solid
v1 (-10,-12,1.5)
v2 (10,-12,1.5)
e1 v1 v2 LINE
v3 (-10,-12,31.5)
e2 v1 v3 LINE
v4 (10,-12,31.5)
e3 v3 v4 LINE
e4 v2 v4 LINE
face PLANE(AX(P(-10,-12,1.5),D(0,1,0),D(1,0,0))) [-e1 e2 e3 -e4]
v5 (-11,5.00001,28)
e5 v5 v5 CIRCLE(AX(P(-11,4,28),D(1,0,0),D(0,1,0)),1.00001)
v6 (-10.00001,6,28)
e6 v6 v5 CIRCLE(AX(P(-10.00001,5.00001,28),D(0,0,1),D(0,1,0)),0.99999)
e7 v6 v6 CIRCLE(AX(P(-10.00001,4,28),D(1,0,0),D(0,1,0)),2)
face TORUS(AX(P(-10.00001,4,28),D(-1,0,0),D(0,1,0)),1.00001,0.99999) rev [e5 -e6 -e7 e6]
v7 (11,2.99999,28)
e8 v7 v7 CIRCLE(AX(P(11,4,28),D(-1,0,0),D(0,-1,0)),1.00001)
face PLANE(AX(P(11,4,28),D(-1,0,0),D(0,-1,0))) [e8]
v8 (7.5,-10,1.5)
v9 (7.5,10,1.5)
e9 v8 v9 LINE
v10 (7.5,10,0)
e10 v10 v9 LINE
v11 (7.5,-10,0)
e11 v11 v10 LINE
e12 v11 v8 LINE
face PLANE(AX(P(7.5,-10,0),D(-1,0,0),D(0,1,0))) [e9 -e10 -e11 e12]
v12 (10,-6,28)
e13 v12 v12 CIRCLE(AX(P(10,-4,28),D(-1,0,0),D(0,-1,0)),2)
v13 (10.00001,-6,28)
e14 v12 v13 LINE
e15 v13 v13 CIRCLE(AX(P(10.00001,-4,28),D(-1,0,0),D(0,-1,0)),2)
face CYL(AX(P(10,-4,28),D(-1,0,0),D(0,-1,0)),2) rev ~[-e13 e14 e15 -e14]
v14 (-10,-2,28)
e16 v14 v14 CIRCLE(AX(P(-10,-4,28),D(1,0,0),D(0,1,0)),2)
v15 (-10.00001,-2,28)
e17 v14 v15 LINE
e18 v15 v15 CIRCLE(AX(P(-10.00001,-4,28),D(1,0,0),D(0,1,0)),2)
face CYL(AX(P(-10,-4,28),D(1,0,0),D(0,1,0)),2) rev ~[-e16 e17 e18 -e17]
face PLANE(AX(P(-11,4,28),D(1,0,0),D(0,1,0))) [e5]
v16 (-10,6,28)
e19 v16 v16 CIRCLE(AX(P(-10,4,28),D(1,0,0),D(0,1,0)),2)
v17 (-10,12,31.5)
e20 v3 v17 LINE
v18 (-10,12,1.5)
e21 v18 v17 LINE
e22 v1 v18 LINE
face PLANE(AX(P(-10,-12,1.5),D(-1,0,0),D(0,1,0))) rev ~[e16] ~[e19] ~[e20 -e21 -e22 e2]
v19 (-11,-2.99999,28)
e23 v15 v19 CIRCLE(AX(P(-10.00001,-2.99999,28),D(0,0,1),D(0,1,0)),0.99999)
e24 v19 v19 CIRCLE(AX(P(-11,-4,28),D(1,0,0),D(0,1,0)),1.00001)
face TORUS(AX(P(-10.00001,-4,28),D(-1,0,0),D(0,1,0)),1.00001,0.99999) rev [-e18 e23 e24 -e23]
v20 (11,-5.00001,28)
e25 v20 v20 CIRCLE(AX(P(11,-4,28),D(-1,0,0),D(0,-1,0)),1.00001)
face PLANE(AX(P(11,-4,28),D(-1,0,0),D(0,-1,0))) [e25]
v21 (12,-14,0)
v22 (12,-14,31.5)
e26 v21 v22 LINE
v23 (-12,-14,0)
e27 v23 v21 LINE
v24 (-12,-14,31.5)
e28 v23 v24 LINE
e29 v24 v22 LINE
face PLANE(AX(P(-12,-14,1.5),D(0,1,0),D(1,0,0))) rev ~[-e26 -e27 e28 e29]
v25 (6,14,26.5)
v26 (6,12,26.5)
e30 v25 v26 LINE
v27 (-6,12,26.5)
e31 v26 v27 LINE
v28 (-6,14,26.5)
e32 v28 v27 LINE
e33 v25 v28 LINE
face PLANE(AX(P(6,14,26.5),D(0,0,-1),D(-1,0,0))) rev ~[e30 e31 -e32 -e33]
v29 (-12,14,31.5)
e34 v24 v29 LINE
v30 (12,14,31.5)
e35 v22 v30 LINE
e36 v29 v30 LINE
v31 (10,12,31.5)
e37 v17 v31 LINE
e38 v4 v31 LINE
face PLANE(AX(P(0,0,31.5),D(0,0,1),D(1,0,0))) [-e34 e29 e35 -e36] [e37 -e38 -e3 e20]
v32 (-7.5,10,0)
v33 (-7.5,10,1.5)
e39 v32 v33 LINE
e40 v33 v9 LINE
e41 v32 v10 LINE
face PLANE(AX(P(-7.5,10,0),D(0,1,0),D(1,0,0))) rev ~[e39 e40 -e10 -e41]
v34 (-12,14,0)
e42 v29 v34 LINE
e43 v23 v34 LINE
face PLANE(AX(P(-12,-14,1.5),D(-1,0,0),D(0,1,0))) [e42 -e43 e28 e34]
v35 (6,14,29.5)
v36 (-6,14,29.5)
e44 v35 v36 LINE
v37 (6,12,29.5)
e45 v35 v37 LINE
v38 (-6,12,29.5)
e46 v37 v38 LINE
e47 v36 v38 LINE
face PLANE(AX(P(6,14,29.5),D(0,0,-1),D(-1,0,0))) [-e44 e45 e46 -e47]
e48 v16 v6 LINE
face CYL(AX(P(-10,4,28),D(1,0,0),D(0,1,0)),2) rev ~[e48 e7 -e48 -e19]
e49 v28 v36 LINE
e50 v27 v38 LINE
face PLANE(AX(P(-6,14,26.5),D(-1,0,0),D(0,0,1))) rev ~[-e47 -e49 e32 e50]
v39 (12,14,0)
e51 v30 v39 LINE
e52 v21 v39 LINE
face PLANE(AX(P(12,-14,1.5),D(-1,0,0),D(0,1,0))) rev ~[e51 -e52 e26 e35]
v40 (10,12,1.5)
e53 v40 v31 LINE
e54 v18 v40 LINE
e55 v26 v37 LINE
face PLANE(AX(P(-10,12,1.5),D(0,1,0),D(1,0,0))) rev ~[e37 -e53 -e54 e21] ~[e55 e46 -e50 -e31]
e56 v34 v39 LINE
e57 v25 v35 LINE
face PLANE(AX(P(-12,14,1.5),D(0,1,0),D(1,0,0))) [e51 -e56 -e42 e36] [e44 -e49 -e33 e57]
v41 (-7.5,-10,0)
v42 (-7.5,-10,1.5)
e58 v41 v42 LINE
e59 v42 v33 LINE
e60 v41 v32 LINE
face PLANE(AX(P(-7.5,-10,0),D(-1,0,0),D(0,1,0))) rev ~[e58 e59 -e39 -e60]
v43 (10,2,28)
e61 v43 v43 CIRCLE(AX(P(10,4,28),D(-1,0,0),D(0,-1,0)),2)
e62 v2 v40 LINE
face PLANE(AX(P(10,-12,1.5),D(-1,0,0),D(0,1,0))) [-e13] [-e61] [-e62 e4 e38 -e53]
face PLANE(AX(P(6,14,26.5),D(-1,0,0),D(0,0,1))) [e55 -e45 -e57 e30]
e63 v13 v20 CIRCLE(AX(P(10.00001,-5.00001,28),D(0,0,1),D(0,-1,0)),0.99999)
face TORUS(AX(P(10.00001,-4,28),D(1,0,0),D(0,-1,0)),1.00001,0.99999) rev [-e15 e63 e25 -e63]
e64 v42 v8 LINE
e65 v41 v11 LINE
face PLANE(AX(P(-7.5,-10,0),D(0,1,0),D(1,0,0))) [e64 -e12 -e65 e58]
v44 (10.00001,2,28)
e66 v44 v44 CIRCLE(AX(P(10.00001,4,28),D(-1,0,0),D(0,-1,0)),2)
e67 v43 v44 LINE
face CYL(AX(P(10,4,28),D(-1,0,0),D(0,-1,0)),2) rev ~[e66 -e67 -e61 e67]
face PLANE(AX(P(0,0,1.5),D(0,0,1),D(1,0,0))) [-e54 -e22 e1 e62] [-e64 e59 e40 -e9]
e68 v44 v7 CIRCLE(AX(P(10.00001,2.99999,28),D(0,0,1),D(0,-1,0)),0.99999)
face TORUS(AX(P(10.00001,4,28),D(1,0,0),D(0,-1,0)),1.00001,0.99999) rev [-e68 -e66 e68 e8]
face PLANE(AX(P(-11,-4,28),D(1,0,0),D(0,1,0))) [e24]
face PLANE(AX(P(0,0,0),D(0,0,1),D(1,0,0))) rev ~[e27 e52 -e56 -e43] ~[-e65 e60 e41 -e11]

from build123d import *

# Parameters (mm, degrees)
F0_W      = 24
F0_H      = 28
F0_W_2    = 15
F0_H_2    = 20
F1_DEPTH  = 1.5
F2_W      = 24
F2_H      = 28
F2_W_2    = 20
F2_H_2    = 24
F3_DEPTH  = 30
F4_R      = 2
F5_DEPTH  = 1
F6_R      = 2
F7_DEPTH  = 1
F8_R      = 0.99999
F9_W      = 12
F9_H      = 3
F10_DEPTH = 2


# Not quite as in the source:
# - a fillet or chamfer is up to 0.001 mm smaller than in the source, because OpenCascade refuses the exact size


with BuildPart() as f1:
    # F0 (on Top) → F1 (new body)
    with BuildSketch(Plane.XY):
        Rectangle(F0_W, F0_H)
        Rectangle(F0_W_2, F0_H_2, mode=Mode.SUBTRACT)
    extrude(amount=F1_DEPTH)

    # F2 (on face) → F3 (join)
    with BuildSketch(Plane.XY.offset(1.5)):
        Rectangle(F2_W, F2_H)
        Rectangle(F2_W_2, F2_H_2, mode=Mode.SUBTRACT)
    extrude(amount=F3_DEPTH)

    # F4 (on face) → F5 (cut)
    with BuildSketch(Plane.YZ.offset(-10)):
        with Locations((-4, 28)):
            Circle(F4_R)
        with Locations((4, 28)):
            Circle(F4_R)
    extrude(amount=-F5_DEPTH, mode=Mode.SUBTRACT)

    # F6 (on face) → F7 (cut)
    with BuildSketch(Plane(origin=(10, 0, 0), x_dir=(0, -1, 0), z_dir=(-1, 0, 0))):
        with Locations((4, 28)):
            Circle(F6_R)
        with Locations((-4, 28)):
            Circle(F6_R)
    extrude(amount=-F7_DEPTH, mode=Mode.SUBTRACT)

    # F8 (radius 1 in the source; OpenCascade refuses exactly that, so slightly less here)
    f8_edges = [f1.edges().sort_by_distance(p)[0] for p in [
        (11, -2, 28),
        (11, 6, 28),
        (-11, -6, 28),
        (-11, 2, 28),
    ]]
    fillet(f8_edges, radius=F8_R)

    # F9 (on face) → F10 (cut, through all)
    with BuildSketch(Plane(origin=(0, 14, 0), x_dir=(-1, 0, 0), z_dir=(0, 1, 0))):
        with Locations((0, 28)):
            Rectangle(F9_W, F9_H)
    extrude(amount=-F10_DEPTH, mode=Mode.SUBTRACT)


solid = f1.part
